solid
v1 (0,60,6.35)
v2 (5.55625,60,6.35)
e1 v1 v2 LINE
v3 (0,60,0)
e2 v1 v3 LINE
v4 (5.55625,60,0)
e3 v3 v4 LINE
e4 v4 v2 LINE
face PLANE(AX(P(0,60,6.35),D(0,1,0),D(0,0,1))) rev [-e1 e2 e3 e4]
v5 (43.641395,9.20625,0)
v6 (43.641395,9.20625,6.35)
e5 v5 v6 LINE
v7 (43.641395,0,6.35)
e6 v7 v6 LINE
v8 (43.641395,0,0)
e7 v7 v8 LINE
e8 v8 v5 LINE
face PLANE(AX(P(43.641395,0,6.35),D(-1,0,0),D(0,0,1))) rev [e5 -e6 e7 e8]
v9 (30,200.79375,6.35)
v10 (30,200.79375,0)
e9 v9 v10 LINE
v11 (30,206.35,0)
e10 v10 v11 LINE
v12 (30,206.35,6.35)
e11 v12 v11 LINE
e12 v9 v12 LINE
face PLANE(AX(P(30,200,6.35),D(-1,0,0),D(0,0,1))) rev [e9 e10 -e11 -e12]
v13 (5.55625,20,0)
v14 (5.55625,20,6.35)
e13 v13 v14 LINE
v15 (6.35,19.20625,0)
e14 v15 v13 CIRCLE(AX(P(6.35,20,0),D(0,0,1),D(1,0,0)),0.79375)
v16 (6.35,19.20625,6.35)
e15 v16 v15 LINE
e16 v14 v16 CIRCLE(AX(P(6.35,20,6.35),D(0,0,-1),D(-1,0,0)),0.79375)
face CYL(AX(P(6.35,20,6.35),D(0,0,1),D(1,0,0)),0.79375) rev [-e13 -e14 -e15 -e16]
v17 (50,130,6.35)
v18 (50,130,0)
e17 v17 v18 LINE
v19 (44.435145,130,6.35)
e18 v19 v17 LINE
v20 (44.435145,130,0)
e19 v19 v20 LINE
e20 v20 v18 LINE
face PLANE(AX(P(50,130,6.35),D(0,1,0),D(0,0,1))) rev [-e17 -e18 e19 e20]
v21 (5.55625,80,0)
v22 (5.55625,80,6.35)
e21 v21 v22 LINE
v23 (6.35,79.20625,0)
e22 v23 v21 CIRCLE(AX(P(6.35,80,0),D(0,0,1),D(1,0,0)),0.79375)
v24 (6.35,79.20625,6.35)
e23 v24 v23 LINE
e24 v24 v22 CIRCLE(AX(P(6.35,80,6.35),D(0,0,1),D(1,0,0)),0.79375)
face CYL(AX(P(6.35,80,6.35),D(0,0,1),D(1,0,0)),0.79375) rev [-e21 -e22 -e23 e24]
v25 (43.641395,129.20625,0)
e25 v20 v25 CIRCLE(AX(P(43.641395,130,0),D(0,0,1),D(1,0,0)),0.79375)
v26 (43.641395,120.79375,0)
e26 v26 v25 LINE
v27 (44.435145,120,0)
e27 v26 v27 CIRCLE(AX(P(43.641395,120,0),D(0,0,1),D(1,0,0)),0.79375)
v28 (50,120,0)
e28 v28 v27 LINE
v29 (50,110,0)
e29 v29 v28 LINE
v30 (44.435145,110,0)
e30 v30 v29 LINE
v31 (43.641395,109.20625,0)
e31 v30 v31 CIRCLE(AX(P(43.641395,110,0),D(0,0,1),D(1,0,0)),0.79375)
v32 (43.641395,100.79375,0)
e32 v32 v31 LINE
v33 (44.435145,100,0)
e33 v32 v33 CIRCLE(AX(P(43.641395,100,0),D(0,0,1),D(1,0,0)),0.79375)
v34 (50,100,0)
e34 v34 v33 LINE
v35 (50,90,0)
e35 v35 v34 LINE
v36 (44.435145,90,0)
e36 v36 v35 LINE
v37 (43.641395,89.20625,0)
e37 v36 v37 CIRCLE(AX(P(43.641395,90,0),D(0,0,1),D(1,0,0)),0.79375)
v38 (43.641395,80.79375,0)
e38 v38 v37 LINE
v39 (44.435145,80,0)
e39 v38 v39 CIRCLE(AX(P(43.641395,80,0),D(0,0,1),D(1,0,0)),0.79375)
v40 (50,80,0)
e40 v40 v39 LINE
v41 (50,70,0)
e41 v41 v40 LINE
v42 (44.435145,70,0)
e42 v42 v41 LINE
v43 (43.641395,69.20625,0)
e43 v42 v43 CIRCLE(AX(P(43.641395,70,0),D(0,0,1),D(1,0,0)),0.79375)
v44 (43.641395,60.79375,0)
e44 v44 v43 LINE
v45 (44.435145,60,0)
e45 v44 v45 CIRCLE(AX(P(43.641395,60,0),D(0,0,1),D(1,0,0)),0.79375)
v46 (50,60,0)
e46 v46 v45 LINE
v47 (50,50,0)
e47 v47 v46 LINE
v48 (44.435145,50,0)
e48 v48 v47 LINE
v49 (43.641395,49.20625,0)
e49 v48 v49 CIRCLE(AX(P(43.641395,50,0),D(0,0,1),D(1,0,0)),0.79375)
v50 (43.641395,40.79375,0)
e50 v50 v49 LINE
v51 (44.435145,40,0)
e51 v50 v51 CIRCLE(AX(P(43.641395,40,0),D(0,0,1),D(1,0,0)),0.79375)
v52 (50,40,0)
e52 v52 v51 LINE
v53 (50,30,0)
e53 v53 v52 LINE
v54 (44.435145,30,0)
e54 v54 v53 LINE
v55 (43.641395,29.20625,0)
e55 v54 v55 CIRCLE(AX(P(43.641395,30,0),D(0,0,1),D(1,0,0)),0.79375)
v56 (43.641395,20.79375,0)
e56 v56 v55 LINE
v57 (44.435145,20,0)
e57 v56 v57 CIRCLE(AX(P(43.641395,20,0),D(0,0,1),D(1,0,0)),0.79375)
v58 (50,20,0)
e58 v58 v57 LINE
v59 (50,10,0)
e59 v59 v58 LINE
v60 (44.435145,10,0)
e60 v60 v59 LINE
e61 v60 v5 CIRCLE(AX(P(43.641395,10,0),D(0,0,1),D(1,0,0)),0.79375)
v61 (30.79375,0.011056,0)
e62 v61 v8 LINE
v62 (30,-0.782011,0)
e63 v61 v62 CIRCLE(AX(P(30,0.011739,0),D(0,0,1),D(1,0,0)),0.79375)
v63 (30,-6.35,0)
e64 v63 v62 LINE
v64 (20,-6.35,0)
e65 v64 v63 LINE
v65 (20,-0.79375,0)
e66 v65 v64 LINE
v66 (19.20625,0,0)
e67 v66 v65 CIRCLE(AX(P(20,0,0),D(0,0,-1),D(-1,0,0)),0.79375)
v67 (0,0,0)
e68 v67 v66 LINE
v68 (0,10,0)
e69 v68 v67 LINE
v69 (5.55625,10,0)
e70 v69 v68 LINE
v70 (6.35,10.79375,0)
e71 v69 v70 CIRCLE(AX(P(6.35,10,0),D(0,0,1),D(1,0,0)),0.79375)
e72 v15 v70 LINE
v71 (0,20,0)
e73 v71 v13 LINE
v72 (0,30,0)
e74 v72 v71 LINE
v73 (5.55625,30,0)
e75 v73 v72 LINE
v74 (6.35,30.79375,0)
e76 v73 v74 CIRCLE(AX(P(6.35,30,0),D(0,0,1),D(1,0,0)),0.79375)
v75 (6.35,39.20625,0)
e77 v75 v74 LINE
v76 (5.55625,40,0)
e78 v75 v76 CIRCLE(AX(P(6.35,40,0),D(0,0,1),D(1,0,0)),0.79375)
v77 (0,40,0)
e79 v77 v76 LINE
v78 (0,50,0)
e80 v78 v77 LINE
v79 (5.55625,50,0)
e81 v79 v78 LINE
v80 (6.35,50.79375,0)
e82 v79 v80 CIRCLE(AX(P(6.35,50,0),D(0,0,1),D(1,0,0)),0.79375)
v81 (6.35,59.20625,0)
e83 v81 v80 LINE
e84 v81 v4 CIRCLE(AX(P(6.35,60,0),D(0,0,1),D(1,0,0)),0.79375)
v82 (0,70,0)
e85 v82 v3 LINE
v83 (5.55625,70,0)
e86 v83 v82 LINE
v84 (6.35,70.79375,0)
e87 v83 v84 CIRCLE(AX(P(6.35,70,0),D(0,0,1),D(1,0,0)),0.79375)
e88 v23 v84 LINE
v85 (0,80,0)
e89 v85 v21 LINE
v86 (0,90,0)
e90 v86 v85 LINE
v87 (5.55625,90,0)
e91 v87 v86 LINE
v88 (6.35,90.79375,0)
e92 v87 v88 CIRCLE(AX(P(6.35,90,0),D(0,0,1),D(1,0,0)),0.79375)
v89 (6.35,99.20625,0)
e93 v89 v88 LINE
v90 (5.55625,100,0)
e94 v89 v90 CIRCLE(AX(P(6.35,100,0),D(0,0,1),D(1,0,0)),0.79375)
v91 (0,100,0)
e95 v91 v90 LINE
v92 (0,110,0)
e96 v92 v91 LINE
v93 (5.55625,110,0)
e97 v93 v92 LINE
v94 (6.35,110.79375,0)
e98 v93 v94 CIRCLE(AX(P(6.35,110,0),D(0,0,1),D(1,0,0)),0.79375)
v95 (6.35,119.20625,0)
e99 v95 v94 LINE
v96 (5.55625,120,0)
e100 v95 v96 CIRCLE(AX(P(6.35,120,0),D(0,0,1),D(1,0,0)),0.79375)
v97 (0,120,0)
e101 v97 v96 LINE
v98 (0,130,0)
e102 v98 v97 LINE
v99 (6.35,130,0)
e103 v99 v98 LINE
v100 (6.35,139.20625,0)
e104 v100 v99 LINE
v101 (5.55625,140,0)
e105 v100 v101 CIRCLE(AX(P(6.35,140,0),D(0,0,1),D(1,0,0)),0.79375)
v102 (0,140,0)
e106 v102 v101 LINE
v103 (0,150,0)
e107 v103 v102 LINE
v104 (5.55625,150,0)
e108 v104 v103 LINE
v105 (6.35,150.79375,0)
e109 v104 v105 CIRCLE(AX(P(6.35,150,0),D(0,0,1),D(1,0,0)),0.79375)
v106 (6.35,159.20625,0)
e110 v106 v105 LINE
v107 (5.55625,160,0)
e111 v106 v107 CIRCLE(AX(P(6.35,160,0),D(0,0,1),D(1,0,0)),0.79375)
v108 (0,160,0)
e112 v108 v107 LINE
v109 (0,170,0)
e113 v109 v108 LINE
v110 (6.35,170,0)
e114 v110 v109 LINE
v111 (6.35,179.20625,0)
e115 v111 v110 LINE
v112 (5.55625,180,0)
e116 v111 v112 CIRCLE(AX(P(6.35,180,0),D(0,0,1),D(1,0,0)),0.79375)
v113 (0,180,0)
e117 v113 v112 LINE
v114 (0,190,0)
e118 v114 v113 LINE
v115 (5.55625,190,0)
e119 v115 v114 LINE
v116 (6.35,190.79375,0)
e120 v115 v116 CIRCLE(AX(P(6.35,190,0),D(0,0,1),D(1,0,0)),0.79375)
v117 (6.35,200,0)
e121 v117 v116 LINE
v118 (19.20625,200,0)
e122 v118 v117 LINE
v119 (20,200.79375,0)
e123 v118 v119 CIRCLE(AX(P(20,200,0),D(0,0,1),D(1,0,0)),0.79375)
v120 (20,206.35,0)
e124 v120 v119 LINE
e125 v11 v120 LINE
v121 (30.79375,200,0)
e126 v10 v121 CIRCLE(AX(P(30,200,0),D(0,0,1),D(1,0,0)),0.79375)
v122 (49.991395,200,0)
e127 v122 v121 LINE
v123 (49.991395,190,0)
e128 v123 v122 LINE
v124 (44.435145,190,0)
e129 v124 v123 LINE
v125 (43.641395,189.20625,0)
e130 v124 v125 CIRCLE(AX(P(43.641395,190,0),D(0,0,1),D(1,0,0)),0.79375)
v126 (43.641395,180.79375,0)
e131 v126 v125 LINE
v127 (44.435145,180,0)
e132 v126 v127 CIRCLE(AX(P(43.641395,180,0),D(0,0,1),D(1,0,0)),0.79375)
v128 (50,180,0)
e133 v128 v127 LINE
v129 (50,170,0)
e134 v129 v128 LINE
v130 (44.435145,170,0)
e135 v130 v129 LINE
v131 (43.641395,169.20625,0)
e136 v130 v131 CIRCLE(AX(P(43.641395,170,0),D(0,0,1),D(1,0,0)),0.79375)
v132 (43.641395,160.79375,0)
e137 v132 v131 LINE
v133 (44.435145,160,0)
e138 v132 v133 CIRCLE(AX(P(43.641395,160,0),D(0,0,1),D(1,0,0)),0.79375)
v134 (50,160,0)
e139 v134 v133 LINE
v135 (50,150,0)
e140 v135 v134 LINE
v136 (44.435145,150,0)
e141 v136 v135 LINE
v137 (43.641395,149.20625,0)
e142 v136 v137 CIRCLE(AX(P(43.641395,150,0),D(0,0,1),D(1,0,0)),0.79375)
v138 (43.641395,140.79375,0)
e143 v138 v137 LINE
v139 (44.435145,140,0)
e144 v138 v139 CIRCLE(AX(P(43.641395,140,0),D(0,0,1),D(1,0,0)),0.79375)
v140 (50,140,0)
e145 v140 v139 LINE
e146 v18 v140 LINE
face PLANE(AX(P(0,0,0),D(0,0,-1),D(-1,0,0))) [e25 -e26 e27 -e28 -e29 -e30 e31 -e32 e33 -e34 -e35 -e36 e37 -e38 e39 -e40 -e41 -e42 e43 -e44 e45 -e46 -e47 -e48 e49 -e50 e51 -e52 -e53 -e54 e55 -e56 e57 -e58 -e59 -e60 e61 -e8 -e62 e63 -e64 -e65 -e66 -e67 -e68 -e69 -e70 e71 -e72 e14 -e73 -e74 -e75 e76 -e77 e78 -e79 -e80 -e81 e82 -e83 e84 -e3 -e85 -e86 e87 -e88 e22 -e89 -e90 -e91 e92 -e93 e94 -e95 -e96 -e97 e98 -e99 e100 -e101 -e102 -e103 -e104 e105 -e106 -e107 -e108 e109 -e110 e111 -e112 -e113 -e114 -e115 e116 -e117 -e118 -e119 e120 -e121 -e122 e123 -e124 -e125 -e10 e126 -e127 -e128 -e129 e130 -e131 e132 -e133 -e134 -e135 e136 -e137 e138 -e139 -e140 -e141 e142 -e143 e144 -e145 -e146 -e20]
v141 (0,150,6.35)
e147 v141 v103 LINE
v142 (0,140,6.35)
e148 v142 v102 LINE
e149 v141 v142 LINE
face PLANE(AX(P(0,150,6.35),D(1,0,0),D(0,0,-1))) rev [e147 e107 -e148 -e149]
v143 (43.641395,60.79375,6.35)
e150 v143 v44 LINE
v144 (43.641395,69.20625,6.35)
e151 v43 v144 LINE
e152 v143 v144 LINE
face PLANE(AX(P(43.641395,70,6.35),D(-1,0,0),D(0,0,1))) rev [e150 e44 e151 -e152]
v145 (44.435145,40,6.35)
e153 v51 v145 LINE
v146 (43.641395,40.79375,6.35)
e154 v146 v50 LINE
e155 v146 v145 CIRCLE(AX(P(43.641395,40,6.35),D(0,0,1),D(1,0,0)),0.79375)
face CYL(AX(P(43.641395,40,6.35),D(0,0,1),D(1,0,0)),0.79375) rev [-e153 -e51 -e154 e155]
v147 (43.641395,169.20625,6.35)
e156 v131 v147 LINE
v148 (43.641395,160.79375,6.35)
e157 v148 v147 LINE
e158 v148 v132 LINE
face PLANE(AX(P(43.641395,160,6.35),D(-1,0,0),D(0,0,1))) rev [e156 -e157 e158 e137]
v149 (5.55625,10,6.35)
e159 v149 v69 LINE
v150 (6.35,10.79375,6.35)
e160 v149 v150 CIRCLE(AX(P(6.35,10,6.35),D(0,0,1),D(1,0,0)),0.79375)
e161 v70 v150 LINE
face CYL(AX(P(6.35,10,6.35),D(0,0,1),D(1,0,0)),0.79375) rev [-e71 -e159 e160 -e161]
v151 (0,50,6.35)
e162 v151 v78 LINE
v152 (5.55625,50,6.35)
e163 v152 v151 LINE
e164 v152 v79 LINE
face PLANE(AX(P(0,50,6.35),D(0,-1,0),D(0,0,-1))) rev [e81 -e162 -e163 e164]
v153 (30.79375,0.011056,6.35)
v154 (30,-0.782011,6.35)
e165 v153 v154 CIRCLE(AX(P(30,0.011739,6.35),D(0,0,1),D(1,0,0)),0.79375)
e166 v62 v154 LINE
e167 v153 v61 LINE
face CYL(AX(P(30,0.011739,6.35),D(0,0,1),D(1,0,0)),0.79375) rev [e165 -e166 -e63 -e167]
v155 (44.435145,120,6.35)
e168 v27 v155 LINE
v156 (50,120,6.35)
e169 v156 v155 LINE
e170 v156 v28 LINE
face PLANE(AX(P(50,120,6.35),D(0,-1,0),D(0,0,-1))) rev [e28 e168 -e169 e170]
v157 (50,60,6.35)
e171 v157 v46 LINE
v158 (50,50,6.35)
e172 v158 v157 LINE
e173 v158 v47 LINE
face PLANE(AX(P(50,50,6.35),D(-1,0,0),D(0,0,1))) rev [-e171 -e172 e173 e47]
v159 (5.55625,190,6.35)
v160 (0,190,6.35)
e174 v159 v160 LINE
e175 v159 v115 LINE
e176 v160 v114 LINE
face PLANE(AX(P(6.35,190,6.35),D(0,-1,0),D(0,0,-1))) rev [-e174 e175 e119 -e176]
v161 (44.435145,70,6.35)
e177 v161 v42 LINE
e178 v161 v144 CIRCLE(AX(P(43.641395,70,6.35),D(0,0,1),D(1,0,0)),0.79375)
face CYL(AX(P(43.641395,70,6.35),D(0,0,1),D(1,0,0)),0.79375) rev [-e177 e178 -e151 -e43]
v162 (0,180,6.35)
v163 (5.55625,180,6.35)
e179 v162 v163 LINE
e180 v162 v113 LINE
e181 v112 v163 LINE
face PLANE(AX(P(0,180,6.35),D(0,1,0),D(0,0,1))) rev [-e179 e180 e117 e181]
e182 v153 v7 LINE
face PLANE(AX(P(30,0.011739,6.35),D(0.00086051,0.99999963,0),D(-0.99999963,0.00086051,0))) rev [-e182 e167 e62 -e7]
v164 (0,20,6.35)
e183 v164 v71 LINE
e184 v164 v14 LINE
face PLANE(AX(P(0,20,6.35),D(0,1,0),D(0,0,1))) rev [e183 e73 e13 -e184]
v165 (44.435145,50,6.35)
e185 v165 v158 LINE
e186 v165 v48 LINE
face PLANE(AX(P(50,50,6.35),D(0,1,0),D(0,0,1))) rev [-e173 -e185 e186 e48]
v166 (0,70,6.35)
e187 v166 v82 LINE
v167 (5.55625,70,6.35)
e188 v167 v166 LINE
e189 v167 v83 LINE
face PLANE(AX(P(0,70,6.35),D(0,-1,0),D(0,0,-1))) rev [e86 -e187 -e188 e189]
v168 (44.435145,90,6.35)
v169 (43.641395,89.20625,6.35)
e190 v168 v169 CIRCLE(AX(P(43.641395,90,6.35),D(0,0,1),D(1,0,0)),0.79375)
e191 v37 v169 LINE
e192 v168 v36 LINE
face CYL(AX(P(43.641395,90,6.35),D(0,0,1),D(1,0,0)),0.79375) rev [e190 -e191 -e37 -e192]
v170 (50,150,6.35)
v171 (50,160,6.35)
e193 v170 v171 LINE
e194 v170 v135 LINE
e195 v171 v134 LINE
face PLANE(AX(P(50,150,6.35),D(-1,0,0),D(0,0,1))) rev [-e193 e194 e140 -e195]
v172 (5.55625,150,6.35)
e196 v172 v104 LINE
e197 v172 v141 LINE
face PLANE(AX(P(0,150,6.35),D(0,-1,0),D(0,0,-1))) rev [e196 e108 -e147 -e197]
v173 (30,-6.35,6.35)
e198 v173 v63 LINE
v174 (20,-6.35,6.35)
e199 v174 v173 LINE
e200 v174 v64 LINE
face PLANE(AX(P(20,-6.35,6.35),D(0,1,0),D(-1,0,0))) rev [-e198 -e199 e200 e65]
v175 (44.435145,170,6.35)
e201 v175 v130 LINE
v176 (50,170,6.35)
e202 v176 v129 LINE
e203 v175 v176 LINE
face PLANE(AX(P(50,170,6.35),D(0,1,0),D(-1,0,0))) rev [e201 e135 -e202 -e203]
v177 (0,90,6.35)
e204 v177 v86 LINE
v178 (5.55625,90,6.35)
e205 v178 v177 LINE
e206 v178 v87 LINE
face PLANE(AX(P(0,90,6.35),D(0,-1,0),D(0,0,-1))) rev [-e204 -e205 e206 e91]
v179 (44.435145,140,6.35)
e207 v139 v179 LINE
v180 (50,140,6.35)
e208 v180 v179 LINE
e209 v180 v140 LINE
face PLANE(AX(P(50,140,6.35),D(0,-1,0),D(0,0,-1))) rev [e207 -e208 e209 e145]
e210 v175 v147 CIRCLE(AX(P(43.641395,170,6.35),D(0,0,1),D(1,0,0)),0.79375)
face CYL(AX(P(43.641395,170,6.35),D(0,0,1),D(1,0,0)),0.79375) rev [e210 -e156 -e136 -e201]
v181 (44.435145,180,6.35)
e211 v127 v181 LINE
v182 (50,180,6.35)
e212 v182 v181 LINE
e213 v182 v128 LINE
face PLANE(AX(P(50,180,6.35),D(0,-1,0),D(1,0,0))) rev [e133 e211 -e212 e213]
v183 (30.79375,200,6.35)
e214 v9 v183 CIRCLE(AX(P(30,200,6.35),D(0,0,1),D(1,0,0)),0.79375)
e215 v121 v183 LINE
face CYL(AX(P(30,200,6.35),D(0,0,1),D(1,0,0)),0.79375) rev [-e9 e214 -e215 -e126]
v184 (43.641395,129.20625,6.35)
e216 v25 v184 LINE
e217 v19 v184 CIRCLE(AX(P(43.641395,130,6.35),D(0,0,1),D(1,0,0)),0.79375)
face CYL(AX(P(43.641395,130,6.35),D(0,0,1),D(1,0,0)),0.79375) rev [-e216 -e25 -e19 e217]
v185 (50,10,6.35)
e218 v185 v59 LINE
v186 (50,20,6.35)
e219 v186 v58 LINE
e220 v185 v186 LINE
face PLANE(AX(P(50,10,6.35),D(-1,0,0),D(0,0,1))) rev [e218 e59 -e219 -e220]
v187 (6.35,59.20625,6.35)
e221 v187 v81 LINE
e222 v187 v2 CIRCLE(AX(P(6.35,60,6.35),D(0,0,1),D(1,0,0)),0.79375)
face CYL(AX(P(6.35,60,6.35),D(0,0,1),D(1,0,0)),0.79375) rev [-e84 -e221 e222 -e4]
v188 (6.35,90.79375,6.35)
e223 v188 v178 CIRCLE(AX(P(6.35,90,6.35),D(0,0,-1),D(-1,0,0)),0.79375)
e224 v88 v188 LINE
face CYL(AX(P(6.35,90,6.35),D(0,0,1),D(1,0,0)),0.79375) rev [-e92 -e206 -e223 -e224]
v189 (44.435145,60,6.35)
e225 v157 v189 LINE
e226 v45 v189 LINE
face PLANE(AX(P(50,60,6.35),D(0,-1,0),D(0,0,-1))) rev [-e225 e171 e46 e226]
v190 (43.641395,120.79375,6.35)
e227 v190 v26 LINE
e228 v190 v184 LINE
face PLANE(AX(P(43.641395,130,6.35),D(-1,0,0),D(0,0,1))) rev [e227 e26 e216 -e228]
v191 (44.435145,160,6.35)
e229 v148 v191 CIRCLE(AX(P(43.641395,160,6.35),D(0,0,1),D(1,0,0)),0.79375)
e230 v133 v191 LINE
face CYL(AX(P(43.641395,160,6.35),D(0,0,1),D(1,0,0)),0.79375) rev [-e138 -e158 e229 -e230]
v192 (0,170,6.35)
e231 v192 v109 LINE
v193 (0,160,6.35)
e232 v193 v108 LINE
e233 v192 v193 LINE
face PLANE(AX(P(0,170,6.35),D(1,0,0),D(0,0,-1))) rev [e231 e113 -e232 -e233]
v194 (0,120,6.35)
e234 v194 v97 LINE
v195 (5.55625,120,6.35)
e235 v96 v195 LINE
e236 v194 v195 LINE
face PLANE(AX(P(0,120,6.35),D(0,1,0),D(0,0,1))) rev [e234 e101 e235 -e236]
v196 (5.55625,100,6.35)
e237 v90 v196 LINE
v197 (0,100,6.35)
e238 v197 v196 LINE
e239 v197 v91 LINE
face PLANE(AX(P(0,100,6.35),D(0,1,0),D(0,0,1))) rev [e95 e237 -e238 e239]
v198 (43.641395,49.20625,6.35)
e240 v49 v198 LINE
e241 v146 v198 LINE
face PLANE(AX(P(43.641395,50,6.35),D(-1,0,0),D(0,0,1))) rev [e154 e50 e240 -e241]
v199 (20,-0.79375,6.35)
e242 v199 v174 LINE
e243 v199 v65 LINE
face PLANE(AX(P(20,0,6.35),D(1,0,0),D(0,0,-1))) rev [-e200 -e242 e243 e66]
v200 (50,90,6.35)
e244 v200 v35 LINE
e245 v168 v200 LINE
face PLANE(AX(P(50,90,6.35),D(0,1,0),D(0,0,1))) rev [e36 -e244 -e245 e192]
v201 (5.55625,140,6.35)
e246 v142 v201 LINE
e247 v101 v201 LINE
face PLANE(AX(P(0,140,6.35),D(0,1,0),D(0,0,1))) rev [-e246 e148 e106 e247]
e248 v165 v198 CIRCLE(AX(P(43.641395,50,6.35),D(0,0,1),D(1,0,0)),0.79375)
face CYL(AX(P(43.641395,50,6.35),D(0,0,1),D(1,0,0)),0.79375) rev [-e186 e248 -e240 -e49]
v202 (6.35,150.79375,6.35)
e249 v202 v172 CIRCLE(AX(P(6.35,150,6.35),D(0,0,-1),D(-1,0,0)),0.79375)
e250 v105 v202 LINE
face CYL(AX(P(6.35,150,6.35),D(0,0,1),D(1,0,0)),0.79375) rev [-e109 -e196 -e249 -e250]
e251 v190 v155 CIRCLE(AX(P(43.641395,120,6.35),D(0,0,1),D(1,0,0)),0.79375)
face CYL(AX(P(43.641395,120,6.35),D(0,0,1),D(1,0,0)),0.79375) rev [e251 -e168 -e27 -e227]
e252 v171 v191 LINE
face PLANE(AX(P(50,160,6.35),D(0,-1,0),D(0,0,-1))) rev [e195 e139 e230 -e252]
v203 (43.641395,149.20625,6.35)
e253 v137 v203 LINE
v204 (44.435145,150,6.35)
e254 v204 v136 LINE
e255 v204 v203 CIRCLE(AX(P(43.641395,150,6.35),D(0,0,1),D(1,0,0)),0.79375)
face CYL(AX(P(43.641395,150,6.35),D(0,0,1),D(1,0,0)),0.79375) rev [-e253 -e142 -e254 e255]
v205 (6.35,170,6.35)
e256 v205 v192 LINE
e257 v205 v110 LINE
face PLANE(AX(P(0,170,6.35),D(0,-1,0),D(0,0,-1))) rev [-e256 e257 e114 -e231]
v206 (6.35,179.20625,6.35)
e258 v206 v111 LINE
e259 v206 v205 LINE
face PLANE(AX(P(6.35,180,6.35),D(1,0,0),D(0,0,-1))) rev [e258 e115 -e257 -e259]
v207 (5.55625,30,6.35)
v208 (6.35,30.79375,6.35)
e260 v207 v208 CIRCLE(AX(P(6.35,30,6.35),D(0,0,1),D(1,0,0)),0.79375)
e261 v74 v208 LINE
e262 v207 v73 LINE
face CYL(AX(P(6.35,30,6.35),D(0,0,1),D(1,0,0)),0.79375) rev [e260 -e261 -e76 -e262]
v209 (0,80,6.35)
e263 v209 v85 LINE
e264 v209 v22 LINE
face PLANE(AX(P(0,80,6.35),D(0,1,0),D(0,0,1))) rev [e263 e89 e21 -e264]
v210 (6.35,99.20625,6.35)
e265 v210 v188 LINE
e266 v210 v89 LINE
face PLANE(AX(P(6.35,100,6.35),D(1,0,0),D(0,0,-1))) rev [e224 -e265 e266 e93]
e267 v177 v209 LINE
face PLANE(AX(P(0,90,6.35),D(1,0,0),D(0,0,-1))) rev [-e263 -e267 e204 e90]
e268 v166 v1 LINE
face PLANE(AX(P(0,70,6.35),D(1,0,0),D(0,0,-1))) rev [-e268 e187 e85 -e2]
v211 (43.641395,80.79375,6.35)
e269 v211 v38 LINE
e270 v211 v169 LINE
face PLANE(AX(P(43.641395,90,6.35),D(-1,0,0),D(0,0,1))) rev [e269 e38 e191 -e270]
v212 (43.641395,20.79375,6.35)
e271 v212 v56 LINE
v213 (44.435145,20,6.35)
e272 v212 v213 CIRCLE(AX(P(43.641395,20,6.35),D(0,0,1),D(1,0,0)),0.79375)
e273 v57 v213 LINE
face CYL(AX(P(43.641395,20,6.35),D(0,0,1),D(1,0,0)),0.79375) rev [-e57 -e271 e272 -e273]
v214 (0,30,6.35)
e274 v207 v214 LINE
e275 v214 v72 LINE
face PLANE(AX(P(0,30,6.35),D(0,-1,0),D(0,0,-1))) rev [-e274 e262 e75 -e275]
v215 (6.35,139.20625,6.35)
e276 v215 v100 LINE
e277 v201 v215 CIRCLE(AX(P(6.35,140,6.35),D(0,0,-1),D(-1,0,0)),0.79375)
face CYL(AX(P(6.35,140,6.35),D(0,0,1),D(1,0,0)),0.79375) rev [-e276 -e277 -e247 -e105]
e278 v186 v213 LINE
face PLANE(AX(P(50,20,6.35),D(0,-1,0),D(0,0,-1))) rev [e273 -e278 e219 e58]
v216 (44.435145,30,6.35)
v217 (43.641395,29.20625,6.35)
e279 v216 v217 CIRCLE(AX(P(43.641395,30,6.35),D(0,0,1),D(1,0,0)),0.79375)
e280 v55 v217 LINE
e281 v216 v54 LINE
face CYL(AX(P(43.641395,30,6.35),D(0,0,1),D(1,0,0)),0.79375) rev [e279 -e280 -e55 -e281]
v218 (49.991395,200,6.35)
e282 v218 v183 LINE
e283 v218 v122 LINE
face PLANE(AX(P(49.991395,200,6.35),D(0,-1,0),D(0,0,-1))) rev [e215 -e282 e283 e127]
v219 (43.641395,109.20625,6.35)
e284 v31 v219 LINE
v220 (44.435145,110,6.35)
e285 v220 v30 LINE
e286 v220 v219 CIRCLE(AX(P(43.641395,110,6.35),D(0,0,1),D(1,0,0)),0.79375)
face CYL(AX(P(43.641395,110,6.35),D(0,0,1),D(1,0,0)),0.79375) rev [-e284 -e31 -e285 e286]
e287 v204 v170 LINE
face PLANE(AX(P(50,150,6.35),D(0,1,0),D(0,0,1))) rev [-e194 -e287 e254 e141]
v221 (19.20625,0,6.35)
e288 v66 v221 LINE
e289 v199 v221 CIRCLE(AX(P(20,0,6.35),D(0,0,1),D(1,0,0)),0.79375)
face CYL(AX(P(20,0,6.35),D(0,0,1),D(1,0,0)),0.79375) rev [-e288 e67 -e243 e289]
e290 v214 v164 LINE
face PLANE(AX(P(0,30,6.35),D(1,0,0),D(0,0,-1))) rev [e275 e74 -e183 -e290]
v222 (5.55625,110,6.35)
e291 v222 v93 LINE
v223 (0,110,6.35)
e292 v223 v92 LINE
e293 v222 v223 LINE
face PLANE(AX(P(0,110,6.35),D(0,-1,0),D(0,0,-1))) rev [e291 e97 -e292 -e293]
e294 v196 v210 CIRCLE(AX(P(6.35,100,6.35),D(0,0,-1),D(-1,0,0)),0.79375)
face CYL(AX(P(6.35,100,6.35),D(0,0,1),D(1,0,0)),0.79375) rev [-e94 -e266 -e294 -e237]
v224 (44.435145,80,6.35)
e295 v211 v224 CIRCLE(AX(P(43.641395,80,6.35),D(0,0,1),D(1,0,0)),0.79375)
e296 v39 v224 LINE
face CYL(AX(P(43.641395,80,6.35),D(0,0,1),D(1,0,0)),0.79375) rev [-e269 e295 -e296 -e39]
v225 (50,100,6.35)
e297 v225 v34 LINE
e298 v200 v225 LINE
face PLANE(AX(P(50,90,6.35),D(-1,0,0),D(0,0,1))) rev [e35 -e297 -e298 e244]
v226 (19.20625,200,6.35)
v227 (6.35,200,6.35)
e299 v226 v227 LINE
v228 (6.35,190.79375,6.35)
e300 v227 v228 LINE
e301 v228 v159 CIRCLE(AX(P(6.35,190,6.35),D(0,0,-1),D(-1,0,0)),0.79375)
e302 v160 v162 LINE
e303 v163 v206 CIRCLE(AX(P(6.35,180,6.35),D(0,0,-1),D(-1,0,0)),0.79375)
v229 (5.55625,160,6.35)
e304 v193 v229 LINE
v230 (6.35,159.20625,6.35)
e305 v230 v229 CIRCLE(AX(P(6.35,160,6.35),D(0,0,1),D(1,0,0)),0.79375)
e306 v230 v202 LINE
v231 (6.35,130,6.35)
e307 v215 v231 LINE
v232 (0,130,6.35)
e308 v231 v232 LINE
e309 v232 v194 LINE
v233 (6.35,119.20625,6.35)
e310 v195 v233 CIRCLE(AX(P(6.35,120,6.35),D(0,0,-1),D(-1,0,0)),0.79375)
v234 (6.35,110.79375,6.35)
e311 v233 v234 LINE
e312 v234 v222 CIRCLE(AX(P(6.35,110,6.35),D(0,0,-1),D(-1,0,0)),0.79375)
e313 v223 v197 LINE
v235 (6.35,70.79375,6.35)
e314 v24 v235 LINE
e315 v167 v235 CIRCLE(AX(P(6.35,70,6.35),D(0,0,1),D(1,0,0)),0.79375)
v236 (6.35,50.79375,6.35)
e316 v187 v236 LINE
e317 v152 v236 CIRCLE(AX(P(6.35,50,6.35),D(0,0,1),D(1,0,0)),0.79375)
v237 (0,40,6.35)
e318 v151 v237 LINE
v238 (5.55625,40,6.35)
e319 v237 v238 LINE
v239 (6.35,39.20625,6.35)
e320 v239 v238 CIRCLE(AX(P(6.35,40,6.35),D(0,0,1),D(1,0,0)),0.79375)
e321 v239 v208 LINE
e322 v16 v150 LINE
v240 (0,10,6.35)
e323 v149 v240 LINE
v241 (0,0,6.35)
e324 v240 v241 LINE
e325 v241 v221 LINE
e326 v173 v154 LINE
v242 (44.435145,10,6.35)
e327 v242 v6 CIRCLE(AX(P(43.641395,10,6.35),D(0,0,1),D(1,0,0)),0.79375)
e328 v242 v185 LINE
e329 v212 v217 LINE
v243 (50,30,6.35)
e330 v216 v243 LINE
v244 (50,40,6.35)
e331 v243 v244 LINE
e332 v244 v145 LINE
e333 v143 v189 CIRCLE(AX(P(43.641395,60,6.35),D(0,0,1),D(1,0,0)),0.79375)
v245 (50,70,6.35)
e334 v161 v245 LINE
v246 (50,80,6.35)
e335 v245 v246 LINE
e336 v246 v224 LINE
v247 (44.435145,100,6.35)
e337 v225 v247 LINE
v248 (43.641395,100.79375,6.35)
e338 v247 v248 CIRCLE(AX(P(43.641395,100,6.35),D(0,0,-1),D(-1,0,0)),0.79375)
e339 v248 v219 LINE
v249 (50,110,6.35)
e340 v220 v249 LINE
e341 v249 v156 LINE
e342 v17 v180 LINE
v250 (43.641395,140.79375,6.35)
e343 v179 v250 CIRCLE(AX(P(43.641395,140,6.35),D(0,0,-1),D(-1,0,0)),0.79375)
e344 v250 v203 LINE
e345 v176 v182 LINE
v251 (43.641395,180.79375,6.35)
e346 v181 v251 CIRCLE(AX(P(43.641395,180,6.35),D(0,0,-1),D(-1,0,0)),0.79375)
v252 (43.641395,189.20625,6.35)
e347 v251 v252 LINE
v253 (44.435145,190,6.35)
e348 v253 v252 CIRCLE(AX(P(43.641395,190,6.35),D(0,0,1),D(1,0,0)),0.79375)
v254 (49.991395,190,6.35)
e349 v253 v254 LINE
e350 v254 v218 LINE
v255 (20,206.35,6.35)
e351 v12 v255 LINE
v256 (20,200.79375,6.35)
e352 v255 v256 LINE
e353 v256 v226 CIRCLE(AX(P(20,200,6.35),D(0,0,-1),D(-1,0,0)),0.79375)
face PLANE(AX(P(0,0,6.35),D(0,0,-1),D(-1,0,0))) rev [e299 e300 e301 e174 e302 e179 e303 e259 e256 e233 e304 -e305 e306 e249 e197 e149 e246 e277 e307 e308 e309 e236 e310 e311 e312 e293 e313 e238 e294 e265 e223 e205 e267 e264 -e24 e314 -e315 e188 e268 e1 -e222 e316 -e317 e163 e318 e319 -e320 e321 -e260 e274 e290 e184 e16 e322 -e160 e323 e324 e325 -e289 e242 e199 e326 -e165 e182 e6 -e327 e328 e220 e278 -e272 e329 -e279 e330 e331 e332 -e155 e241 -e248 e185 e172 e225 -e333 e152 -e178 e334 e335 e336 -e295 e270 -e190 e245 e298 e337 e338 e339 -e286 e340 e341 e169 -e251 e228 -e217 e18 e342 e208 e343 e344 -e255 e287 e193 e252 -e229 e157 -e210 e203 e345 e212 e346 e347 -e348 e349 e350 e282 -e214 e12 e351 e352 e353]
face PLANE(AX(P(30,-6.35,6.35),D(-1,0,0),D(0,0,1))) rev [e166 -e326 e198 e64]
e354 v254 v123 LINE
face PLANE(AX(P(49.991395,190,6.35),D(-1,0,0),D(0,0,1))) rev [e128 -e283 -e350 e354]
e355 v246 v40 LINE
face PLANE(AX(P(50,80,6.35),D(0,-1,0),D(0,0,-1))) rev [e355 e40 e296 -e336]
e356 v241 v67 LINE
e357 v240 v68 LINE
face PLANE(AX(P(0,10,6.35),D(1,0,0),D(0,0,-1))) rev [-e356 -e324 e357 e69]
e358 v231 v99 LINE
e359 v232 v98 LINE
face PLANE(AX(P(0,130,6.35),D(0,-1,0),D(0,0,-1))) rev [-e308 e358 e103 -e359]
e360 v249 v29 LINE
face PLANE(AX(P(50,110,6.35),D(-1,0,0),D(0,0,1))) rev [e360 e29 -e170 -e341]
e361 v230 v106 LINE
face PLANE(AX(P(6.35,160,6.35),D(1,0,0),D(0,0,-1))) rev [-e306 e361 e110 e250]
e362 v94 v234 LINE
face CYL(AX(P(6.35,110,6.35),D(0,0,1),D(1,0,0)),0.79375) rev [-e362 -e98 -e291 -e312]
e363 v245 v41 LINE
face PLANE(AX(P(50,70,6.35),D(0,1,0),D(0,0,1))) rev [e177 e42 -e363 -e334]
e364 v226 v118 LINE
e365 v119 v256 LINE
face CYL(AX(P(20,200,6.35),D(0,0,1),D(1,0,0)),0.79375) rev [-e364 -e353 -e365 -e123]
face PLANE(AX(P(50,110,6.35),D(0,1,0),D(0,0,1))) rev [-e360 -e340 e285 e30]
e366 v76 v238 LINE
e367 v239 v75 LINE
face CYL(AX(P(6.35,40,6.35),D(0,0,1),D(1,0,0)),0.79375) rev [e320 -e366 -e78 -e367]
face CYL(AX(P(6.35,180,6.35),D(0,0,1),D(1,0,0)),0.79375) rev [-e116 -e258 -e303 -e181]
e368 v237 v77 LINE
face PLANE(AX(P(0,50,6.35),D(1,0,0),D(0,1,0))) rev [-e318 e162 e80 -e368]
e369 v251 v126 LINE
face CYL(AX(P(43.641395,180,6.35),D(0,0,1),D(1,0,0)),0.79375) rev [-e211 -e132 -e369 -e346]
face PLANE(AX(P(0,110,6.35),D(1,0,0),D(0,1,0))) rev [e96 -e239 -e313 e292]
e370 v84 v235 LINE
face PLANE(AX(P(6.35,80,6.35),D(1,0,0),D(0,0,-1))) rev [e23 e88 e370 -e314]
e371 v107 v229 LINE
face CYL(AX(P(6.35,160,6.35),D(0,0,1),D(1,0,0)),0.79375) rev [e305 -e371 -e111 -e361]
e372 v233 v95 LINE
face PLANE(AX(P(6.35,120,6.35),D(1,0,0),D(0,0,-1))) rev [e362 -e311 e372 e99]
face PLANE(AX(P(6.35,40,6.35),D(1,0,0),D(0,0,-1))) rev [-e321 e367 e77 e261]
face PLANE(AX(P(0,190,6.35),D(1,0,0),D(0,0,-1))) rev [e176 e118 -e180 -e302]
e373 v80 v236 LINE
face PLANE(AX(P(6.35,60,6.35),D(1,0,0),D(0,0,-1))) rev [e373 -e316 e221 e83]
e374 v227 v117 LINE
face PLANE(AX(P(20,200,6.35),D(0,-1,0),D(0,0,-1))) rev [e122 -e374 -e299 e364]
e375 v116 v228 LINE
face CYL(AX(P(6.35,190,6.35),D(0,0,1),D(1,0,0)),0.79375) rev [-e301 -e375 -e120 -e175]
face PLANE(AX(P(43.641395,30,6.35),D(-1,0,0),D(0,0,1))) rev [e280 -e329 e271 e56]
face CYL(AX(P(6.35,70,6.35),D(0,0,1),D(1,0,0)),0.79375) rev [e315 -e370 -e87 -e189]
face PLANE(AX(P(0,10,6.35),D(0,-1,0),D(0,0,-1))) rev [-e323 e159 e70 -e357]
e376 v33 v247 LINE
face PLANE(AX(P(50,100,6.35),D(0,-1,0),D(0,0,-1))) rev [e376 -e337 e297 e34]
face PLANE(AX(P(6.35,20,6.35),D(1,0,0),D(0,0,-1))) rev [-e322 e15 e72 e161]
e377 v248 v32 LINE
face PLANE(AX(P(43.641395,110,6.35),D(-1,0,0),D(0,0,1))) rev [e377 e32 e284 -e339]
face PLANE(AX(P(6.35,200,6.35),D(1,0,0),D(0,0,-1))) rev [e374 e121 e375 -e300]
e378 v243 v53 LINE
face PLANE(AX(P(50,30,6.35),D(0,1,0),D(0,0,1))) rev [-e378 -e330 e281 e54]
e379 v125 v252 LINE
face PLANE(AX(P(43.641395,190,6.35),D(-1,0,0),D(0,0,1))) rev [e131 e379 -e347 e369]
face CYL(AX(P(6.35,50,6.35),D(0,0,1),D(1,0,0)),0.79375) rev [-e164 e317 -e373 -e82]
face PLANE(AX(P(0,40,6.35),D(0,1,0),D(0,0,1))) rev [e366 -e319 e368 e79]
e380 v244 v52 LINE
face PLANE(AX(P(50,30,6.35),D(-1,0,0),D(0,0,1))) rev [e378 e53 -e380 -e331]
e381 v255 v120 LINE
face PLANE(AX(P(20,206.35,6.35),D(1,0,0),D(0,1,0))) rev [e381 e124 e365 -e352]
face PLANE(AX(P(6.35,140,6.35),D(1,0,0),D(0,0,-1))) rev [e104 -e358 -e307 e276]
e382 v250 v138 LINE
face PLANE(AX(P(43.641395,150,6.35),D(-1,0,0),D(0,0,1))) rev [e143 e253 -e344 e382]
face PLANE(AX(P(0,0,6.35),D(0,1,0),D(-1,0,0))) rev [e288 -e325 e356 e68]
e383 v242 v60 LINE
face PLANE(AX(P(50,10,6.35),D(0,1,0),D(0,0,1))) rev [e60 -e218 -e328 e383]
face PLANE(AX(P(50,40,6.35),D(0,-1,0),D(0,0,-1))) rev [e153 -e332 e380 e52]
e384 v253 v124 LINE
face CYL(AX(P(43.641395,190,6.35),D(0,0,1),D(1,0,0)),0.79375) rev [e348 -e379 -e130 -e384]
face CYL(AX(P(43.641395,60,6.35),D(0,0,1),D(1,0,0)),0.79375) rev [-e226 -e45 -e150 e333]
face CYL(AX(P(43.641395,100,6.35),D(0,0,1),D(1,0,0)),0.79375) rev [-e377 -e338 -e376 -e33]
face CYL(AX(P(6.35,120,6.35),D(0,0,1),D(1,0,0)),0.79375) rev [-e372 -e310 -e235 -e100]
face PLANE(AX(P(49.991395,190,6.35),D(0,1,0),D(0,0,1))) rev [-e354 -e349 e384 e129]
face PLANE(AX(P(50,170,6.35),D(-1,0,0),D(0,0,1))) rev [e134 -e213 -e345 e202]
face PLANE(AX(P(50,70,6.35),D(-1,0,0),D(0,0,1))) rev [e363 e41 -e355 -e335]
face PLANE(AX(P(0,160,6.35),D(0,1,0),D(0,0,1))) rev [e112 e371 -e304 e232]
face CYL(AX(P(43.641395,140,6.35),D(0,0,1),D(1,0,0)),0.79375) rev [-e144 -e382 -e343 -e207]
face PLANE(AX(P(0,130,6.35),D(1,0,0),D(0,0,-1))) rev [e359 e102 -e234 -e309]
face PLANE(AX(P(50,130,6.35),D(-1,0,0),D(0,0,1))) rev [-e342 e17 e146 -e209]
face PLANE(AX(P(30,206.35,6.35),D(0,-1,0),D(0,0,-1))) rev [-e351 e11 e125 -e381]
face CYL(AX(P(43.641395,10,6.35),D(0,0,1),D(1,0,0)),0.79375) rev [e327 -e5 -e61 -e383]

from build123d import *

# Parameters (mm, degrees)
BOSS_EXTRUDE1_DEPTH            = 6.35
F_1_16_0_0625_DIAMETER_HOLE1_D = 1.5875


# Read off the part's stored shape, not the designer's step: Boss-Extrude1
with BuildPart() as part:
    # Boss-Extrude1 outline → Boss-Extrude1 (new body)
    with BuildSketch(Plane.XY):
        Polygon((43.641394901, 180), (43.641394901, 190), (49.991394901, 190), (49.991394901, 200), (30, 200), (30, 206.35), (20, 206.35), (20, 200), (6.35, 200), (6.35, 190), (0, 190), (0, 180), (6.35, 180), (6.35, 170), (0, 170), (0, 160), (6.35, 160), (6.35, 150), (0, 150), (0, 140), (6.35, 140), (6.35, 130), (0, 130), (0, 120), (6.35, 120), (6.35, 110), (0, 110), (0, 100), (6.35, 100), (6.35, 90), (0, 90), (0, 80), (6.35, 80), (6.35, 70), (0, 70), (0, 60), (6.35, 60), (6.35, 50), (0, 50), (0, 40), (6.35, 40), (6.35, 30), (0, 30), (0, 20), (6.35, 20), (6.35, 10), (0, 10), (0, 0), (20, 0), (20, -6.35), (30, -6.35), (30, 0.011738555), (43.641394901, 0), (43.641394901, 10), (50, 10), (50, 20), (43.641394901, 20), (43.641394901, 30), (50, 30), (50, 40), (43.641394901, 40), (43.641394901, 50), (50, 50), (50, 60), (43.641394901, 60), (43.641394901, 70), (50, 70), (50, 80), (43.641394901, 80), (43.641394901, 90), (50, 90), (50, 100), (43.641394901, 100), (43.641394901, 110), (50, 110), (50, 120), (43.641394901, 120), (43.641394901, 130), (50, 130), (50, 140), (43.641394901, 140), (43.641394901, 150), (50, 150), (50, 160), (43.641394901, 160), (43.641394901, 170), (50, 170), (50, 180), align=None)
    extrude(amount=BOSS_EXTRUDE1_DEPTH)

    # 1/16 (0.0625) Diameter Hole1 (through all)
    with Locations(Plane.XY.offset(6.35)):
        with Locations((6.35, 190), (6.35, 180), (6.35, -2541.231306405), (20, 200), (30, 200), (43.641394901, 190), (43.641394901, 180), (43.641394901, 170), (43.641394901, 160), (43.641394901, 150), (6.35, 150), (6.35, 160), (6.35, 140), (6.35, -2581.231306405), (6.35, 120), (6.35, 110), (6.35, 100), (6.35, 90), (6.35, 80), (6.35, 70), (6.35, 60), (6.35, 50), (6.35, 40), (6.35, 30), (6.35, 20), (6.35, 10), (43.641394901, 140), (43.641394901, 130), (43.641394901, 120), (43.641394901, 110), (43.641394901, 100), (43.641394901, 90), (43.641394901, 80), (43.641394901, 70), (43.641394901, 60), (43.641394901, 50), (43.641394901, 40), (43.641394901, 30), (43.641394901, 20), (43.641394901, 10), (30, 0.011738555), (20, 0)):
            Hole(F_1_16_0_0625_DIAMETER_HOLE1_D / 2)


solid = part.part
